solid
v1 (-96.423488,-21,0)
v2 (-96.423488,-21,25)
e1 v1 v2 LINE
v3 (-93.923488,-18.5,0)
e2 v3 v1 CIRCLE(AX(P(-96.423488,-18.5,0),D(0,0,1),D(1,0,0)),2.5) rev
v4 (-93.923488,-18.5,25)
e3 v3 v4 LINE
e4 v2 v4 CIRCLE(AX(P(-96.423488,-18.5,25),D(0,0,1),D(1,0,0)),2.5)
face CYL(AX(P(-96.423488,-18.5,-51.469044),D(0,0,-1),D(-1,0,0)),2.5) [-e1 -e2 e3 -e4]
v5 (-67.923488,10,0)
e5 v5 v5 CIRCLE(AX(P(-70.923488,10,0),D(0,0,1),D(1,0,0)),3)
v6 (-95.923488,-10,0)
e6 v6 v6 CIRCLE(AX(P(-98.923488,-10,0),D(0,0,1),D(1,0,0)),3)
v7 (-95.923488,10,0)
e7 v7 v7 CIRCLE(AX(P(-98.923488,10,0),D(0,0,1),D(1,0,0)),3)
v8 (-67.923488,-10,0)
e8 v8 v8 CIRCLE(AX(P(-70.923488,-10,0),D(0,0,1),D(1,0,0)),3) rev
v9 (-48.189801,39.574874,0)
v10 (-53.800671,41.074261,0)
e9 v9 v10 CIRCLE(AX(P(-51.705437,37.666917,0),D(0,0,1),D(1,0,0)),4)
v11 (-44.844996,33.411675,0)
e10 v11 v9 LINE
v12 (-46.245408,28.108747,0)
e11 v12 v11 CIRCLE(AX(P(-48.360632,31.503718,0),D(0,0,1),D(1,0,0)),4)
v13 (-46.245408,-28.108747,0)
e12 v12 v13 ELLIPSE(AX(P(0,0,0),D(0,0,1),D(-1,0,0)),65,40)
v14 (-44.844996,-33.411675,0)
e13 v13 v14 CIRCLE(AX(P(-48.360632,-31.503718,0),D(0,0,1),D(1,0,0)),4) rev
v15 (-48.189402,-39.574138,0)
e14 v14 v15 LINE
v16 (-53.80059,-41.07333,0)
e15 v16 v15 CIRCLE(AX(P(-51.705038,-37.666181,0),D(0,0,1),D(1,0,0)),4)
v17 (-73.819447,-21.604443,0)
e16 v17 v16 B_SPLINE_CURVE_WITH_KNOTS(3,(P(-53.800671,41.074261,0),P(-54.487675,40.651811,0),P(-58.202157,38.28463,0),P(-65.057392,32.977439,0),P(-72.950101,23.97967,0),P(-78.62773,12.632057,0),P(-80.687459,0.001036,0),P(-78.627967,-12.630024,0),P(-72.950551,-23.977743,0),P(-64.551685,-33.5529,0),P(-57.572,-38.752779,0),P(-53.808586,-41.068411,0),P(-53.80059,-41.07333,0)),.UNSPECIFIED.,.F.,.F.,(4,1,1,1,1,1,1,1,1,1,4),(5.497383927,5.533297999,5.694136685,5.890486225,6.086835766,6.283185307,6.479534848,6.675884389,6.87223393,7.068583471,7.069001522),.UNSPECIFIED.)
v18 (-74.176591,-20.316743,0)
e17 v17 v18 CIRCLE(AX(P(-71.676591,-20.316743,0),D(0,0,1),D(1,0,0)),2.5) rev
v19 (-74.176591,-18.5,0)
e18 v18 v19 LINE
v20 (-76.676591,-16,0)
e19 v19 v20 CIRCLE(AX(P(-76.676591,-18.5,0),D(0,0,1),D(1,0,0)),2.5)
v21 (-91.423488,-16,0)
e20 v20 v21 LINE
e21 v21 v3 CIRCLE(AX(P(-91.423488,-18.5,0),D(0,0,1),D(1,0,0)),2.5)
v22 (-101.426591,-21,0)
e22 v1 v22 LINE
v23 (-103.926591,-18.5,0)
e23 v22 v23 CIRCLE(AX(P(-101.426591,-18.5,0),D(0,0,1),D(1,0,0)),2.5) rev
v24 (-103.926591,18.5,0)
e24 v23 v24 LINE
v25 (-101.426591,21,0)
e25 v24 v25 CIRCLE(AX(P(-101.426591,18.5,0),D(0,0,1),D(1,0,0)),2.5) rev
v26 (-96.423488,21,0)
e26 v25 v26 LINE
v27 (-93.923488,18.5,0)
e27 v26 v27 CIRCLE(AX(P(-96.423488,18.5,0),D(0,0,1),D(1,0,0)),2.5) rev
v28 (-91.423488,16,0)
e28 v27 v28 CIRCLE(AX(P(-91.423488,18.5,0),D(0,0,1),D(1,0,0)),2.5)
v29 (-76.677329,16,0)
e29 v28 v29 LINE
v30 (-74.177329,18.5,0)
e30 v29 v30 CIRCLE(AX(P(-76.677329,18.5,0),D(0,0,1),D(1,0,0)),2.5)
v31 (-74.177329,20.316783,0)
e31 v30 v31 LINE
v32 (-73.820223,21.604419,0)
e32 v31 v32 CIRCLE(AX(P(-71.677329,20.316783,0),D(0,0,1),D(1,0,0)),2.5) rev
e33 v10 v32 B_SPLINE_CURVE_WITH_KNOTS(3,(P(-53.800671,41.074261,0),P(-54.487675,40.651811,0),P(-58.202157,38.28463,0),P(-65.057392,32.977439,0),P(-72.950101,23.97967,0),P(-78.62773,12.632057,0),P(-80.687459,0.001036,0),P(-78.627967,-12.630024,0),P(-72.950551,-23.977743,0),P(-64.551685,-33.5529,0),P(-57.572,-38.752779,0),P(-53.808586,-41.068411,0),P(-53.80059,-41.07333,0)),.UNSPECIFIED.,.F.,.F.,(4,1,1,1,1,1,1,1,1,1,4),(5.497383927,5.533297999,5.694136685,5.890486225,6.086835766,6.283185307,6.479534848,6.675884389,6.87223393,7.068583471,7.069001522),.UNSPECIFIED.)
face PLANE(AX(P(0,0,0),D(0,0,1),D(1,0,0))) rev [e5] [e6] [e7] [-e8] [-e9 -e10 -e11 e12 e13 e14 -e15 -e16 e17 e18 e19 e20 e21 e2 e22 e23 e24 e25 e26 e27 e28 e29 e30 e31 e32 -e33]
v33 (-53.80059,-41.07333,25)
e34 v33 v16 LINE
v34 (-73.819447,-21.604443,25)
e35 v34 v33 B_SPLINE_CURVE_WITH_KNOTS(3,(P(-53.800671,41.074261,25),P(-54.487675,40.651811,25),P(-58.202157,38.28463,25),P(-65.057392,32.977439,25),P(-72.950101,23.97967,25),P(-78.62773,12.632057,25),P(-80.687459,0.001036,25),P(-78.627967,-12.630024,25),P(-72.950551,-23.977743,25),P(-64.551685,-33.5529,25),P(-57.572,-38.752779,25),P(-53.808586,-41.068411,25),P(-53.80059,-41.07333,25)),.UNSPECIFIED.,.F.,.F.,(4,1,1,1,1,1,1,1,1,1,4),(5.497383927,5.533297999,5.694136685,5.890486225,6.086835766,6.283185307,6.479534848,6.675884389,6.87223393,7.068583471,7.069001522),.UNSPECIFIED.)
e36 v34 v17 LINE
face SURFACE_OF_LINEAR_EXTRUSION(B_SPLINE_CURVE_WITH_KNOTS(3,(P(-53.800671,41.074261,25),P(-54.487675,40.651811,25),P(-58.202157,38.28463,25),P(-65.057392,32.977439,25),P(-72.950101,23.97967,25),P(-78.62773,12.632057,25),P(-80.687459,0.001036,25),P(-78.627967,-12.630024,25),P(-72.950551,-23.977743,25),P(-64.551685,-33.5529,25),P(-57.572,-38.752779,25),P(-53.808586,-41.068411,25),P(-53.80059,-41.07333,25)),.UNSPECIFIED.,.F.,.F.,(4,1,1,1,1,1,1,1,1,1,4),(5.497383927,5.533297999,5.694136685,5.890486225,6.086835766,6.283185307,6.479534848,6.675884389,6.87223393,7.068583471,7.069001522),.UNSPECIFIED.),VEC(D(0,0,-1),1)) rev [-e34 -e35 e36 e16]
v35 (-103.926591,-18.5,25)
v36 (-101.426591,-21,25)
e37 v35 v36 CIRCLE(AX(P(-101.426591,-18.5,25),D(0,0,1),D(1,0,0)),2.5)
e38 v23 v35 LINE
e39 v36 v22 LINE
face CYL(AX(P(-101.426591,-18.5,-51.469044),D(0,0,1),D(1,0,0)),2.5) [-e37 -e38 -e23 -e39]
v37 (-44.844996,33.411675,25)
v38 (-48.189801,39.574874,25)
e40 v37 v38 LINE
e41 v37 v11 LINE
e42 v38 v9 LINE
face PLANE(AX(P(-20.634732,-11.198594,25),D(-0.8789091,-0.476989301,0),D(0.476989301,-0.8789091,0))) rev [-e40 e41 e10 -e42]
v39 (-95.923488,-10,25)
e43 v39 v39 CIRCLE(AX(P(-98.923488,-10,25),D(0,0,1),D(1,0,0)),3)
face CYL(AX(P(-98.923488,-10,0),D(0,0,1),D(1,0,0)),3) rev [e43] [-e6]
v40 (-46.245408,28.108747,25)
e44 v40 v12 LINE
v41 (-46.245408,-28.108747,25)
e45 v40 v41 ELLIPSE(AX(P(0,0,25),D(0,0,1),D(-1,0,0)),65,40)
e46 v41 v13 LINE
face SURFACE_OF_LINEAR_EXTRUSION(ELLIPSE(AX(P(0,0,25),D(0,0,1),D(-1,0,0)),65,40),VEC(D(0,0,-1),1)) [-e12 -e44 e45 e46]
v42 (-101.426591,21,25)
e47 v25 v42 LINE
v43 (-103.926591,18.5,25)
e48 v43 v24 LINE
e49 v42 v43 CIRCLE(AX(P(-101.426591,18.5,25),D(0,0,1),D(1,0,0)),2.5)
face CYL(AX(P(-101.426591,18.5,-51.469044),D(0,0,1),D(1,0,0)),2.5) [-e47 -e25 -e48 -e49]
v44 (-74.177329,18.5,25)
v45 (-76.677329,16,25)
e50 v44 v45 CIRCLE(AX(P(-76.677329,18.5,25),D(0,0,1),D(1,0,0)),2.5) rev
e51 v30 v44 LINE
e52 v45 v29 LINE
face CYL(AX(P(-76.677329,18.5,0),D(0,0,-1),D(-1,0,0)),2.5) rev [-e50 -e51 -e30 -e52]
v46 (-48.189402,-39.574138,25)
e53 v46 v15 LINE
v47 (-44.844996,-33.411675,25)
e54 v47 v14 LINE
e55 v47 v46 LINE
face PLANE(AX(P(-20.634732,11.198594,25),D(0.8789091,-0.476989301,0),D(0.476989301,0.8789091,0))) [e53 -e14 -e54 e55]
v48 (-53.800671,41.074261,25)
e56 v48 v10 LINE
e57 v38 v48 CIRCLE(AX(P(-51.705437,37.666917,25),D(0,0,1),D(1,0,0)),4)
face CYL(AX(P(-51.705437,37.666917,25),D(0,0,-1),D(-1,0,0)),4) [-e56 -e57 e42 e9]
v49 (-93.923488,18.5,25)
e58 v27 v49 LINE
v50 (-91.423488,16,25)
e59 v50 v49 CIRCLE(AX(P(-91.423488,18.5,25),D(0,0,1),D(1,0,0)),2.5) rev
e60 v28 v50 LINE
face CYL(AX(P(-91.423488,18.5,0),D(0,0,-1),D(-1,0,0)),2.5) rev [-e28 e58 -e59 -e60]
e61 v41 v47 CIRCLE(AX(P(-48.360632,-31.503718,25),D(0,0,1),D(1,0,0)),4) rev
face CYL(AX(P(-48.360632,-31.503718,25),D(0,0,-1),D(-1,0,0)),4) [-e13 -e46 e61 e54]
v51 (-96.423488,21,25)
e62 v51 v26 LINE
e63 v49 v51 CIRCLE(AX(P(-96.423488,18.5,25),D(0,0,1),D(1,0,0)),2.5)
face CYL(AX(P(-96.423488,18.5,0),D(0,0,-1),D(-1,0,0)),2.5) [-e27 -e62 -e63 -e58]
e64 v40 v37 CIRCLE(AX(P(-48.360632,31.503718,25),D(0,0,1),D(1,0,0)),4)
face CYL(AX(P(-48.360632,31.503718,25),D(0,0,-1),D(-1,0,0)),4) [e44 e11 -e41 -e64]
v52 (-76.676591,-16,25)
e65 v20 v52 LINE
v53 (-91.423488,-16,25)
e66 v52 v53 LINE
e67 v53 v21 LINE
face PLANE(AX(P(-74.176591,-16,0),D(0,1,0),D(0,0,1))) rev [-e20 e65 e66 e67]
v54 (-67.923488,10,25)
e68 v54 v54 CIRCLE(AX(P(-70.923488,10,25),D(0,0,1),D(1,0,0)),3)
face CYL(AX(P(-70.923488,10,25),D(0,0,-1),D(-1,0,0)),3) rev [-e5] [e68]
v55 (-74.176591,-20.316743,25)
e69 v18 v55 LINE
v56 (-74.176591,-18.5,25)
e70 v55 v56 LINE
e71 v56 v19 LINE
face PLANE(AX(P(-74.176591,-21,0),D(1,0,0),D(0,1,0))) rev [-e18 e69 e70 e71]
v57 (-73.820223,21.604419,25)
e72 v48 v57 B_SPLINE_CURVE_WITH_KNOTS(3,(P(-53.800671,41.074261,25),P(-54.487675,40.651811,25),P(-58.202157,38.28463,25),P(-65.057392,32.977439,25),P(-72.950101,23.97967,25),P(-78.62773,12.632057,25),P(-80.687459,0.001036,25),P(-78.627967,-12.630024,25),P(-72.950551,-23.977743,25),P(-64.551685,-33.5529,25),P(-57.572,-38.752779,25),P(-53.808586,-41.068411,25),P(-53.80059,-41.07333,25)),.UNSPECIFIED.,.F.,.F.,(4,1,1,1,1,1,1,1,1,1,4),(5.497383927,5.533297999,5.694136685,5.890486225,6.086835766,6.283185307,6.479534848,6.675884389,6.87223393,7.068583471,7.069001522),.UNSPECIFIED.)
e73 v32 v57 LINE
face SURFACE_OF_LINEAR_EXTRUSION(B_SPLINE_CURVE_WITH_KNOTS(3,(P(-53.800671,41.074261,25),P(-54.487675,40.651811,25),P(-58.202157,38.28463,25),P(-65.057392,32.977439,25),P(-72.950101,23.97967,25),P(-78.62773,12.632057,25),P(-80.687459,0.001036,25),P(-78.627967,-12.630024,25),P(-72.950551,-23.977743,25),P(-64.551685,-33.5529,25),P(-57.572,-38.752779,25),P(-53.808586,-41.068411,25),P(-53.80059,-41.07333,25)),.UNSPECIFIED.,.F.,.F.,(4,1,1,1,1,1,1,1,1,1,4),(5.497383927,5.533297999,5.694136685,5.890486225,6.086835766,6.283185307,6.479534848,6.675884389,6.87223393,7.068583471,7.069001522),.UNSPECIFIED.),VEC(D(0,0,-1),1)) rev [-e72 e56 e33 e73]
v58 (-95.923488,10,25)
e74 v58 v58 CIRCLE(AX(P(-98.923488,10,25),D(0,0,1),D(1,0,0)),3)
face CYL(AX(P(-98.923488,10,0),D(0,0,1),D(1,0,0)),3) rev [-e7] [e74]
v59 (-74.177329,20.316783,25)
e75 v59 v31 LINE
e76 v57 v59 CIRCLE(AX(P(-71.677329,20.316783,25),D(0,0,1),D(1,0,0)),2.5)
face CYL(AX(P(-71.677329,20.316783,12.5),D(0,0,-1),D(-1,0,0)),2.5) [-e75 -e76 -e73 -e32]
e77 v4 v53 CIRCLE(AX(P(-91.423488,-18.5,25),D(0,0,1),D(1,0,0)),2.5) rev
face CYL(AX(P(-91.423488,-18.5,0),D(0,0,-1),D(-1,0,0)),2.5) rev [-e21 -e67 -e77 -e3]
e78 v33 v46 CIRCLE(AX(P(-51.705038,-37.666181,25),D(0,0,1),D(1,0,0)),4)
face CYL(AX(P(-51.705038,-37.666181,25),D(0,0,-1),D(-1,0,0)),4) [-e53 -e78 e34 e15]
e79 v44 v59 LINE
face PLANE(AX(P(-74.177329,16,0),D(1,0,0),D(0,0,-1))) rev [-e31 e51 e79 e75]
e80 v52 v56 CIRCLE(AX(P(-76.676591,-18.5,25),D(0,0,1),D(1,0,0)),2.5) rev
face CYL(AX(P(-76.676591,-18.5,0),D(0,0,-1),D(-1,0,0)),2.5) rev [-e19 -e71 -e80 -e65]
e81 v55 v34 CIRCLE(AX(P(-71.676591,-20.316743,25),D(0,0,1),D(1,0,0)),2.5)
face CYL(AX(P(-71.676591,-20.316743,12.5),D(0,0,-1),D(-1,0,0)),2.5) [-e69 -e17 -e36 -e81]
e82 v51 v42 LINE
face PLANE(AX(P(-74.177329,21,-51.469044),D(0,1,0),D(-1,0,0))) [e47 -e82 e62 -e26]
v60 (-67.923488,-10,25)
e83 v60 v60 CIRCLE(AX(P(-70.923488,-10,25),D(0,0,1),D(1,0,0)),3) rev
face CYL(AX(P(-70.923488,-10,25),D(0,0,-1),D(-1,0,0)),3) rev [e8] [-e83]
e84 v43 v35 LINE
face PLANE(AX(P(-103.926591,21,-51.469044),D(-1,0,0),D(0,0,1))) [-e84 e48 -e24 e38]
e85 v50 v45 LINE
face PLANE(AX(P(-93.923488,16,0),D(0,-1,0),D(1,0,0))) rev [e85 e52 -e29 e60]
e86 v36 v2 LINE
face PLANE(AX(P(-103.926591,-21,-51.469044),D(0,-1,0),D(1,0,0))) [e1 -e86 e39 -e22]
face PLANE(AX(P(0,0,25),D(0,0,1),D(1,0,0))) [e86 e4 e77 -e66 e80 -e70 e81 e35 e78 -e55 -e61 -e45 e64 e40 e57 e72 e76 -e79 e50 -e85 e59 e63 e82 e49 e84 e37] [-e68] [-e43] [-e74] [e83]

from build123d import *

# Parameters (mm, degrees)
SKETCH2_R           = 3
BOSS_EXTRUDE1_DEPTH = 25
BOSS_EXTRUDE2_DEPTH = 25
SKETCH4_W           = 19.746158687
SKETCH4_H           = 5.000000001
SKETCH4_W_2         = 19.746896681
SKETCH4_H_2         = 5
CUT_EXTRUDE1_DEPTH  = 115.725186296
FILLET1_R           = 2.5
SKETCH5_R           = 3
CUT_EXTRUDE2_DEPTH  = 115.725186296


with BuildPart() as part:
    # Sketch2 → Boss-Extrude1 (new body)
    with BuildSketch(Plane.XY):
        with BuildLine():
            Line((-44.84499572, 33.411675358), (-48.18980095, 39.574873881))
            ThreePointArc((-48.18980095, 39.574873881), (-50.672758106, 41.531314894), (-53.800671062, 41.074261054))
            add(Edge.make_bspline(
                [(-53.800671062, 41.074261054), (-54.48767514, 40.651810622), (-58.202157398, 38.284629617), (-65.057392245, 32.977438932), (-72.95010089, 23.979669569), (-78.627729923, 12.632057233), (-80.687458565, 0.00103574), (-78.627967037, -12.630024416), (-72.950551026, -23.977743332), (-64.551684805, -33.55290014), (-57.571999896, -38.752778812), (-53.808586452, -41.068411447), (-53.800589503, -41.073329934)],
                knots=[5.497383927, 5.497383927, 5.497383927, 5.497383927, 5.533297999, 5.694136685, 5.890486225, 6.086835766, 6.283185307, 6.479534848, 6.675884389, 6.87223393, 7.068583471, 7.069001522, 7.069001522, 7.069001522, 7.069001522], degree=3))
            ThreePointArc((-53.800589503, -41.073329934), (-50.672539001, -41.530627312), (-48.189401667, -39.574138156))
            Line((-48.189401667, -39.574138156), (-44.84499572, -33.411675358))
            ThreePointArc((-44.84499572, -33.411675358), (-44.493215778, -30.482399972), (-46.245407837, -28.108747428))
            add(Edge.make_bspline(
                [(-46.245407837, 28.108747428), (-91.360422528, 0), (-46.245407837, -28.108747428)],
                knots=[5.50397375, 5.50397375, 5.50397375, 7.062396864, 7.062396864, 7.062396864], degree=2, weights=[1, 0.711467813, 1]))
            ThreePointArc((-46.245407837, 28.108747428), (-44.493215778, 30.482399972), (-44.84499572, 33.411675358))
        make_face()
        with Locations((-70.923488038, 10)):
            Circle(SKETCH2_R, mode=Mode.SUBTRACT)
        with Locations((-70.923488038, -10)):
            Circle(SKETCH2_R, mode=Mode.SUBTRACT)
    extrude(amount=BOSS_EXTRUDE1_DEPTH)

    # Sketch3 → Boss-Extrude2 (add)
    with BuildSketch(Plane.XY.offset(25)):
        with BuildLine():
            Line((-74.177329351, 21), (-103.926591357, 21))
            Line((-103.926591357, 21), (-103.926591357, -21))
            Line((-103.926591357, -21), (-74.176591357, -21))
            add(Edge.make_bspline(
                [(-74.177329351, 21), (-75.755958039, 18.282076683), (-78.800306246, 11.573755088), (-80.687458565, 0.00103574), (-78.800400628, -11.572472575), (-75.755678045, -18.281470977), (-74.176591357, -21)],
                knots=[5.939840224, 5.939840224, 5.939840224, 5.939840224, 6.086835766, 6.283185307, 6.479534848, 6.626565531, 6.626565531, 6.626565531, 6.626565531], degree=3))
        make_face()
    extrude(amount=-BOSS_EXTRUDE2_DEPTH)

    # Sketch4 → Cut-Extrude1 (cut, through all)
    with BuildSketch(Plane.XY.offset(25)):
        with Locations((-84.050408695, 18.500000001)):
            Rectangle(SKETCH4_W, SKETCH4_H)
        with Locations((-84.050039698, -18.5)):
            Rectangle(SKETCH4_W_2, SKETCH4_H_2)
    extrude(amount=-CUT_EXTRUDE1_DEPTH, mode=Mode.SUBTRACT)

    # Fillet1
    fillet1_edges = [part.edges().sort_by_distance(p)[0] for p in [
        (-93.923488038, 16, 12.5),
        (-93.923488038, 21.000000001, 12.5),
        (-103.926591357, -21, 12.5),
        (-93.923488038, -21, 12.5),
        (-93.923488038, -16, 12.5),
        (-74.176591357, -16, 12.5),
        (-74.176591357, -21, 12.5),
        (-74.177329351, 21, 12.5),
        (-74.177329351, 16, 12.5),
        (-103.926591357, 21, 12.5),
    ]]
    fillet(fillet1_edges, radius=FILLET1_R - 0.0001)  # a hair under: the kernel refuses the full size

    # Sketch5 → Cut-Extrude2 (cut, through all)
    with BuildSketch(Plane.XY.offset(25)):
        with Locations((-98.923488038, 10)):
            Circle(SKETCH5_R)
        with Locations((-98.923488038, -10)):
            Circle(SKETCH5_R)
    extrude(amount=-CUT_EXTRUDE2_DEPTH, mode=Mode.SUBTRACT)


solid = part.part
